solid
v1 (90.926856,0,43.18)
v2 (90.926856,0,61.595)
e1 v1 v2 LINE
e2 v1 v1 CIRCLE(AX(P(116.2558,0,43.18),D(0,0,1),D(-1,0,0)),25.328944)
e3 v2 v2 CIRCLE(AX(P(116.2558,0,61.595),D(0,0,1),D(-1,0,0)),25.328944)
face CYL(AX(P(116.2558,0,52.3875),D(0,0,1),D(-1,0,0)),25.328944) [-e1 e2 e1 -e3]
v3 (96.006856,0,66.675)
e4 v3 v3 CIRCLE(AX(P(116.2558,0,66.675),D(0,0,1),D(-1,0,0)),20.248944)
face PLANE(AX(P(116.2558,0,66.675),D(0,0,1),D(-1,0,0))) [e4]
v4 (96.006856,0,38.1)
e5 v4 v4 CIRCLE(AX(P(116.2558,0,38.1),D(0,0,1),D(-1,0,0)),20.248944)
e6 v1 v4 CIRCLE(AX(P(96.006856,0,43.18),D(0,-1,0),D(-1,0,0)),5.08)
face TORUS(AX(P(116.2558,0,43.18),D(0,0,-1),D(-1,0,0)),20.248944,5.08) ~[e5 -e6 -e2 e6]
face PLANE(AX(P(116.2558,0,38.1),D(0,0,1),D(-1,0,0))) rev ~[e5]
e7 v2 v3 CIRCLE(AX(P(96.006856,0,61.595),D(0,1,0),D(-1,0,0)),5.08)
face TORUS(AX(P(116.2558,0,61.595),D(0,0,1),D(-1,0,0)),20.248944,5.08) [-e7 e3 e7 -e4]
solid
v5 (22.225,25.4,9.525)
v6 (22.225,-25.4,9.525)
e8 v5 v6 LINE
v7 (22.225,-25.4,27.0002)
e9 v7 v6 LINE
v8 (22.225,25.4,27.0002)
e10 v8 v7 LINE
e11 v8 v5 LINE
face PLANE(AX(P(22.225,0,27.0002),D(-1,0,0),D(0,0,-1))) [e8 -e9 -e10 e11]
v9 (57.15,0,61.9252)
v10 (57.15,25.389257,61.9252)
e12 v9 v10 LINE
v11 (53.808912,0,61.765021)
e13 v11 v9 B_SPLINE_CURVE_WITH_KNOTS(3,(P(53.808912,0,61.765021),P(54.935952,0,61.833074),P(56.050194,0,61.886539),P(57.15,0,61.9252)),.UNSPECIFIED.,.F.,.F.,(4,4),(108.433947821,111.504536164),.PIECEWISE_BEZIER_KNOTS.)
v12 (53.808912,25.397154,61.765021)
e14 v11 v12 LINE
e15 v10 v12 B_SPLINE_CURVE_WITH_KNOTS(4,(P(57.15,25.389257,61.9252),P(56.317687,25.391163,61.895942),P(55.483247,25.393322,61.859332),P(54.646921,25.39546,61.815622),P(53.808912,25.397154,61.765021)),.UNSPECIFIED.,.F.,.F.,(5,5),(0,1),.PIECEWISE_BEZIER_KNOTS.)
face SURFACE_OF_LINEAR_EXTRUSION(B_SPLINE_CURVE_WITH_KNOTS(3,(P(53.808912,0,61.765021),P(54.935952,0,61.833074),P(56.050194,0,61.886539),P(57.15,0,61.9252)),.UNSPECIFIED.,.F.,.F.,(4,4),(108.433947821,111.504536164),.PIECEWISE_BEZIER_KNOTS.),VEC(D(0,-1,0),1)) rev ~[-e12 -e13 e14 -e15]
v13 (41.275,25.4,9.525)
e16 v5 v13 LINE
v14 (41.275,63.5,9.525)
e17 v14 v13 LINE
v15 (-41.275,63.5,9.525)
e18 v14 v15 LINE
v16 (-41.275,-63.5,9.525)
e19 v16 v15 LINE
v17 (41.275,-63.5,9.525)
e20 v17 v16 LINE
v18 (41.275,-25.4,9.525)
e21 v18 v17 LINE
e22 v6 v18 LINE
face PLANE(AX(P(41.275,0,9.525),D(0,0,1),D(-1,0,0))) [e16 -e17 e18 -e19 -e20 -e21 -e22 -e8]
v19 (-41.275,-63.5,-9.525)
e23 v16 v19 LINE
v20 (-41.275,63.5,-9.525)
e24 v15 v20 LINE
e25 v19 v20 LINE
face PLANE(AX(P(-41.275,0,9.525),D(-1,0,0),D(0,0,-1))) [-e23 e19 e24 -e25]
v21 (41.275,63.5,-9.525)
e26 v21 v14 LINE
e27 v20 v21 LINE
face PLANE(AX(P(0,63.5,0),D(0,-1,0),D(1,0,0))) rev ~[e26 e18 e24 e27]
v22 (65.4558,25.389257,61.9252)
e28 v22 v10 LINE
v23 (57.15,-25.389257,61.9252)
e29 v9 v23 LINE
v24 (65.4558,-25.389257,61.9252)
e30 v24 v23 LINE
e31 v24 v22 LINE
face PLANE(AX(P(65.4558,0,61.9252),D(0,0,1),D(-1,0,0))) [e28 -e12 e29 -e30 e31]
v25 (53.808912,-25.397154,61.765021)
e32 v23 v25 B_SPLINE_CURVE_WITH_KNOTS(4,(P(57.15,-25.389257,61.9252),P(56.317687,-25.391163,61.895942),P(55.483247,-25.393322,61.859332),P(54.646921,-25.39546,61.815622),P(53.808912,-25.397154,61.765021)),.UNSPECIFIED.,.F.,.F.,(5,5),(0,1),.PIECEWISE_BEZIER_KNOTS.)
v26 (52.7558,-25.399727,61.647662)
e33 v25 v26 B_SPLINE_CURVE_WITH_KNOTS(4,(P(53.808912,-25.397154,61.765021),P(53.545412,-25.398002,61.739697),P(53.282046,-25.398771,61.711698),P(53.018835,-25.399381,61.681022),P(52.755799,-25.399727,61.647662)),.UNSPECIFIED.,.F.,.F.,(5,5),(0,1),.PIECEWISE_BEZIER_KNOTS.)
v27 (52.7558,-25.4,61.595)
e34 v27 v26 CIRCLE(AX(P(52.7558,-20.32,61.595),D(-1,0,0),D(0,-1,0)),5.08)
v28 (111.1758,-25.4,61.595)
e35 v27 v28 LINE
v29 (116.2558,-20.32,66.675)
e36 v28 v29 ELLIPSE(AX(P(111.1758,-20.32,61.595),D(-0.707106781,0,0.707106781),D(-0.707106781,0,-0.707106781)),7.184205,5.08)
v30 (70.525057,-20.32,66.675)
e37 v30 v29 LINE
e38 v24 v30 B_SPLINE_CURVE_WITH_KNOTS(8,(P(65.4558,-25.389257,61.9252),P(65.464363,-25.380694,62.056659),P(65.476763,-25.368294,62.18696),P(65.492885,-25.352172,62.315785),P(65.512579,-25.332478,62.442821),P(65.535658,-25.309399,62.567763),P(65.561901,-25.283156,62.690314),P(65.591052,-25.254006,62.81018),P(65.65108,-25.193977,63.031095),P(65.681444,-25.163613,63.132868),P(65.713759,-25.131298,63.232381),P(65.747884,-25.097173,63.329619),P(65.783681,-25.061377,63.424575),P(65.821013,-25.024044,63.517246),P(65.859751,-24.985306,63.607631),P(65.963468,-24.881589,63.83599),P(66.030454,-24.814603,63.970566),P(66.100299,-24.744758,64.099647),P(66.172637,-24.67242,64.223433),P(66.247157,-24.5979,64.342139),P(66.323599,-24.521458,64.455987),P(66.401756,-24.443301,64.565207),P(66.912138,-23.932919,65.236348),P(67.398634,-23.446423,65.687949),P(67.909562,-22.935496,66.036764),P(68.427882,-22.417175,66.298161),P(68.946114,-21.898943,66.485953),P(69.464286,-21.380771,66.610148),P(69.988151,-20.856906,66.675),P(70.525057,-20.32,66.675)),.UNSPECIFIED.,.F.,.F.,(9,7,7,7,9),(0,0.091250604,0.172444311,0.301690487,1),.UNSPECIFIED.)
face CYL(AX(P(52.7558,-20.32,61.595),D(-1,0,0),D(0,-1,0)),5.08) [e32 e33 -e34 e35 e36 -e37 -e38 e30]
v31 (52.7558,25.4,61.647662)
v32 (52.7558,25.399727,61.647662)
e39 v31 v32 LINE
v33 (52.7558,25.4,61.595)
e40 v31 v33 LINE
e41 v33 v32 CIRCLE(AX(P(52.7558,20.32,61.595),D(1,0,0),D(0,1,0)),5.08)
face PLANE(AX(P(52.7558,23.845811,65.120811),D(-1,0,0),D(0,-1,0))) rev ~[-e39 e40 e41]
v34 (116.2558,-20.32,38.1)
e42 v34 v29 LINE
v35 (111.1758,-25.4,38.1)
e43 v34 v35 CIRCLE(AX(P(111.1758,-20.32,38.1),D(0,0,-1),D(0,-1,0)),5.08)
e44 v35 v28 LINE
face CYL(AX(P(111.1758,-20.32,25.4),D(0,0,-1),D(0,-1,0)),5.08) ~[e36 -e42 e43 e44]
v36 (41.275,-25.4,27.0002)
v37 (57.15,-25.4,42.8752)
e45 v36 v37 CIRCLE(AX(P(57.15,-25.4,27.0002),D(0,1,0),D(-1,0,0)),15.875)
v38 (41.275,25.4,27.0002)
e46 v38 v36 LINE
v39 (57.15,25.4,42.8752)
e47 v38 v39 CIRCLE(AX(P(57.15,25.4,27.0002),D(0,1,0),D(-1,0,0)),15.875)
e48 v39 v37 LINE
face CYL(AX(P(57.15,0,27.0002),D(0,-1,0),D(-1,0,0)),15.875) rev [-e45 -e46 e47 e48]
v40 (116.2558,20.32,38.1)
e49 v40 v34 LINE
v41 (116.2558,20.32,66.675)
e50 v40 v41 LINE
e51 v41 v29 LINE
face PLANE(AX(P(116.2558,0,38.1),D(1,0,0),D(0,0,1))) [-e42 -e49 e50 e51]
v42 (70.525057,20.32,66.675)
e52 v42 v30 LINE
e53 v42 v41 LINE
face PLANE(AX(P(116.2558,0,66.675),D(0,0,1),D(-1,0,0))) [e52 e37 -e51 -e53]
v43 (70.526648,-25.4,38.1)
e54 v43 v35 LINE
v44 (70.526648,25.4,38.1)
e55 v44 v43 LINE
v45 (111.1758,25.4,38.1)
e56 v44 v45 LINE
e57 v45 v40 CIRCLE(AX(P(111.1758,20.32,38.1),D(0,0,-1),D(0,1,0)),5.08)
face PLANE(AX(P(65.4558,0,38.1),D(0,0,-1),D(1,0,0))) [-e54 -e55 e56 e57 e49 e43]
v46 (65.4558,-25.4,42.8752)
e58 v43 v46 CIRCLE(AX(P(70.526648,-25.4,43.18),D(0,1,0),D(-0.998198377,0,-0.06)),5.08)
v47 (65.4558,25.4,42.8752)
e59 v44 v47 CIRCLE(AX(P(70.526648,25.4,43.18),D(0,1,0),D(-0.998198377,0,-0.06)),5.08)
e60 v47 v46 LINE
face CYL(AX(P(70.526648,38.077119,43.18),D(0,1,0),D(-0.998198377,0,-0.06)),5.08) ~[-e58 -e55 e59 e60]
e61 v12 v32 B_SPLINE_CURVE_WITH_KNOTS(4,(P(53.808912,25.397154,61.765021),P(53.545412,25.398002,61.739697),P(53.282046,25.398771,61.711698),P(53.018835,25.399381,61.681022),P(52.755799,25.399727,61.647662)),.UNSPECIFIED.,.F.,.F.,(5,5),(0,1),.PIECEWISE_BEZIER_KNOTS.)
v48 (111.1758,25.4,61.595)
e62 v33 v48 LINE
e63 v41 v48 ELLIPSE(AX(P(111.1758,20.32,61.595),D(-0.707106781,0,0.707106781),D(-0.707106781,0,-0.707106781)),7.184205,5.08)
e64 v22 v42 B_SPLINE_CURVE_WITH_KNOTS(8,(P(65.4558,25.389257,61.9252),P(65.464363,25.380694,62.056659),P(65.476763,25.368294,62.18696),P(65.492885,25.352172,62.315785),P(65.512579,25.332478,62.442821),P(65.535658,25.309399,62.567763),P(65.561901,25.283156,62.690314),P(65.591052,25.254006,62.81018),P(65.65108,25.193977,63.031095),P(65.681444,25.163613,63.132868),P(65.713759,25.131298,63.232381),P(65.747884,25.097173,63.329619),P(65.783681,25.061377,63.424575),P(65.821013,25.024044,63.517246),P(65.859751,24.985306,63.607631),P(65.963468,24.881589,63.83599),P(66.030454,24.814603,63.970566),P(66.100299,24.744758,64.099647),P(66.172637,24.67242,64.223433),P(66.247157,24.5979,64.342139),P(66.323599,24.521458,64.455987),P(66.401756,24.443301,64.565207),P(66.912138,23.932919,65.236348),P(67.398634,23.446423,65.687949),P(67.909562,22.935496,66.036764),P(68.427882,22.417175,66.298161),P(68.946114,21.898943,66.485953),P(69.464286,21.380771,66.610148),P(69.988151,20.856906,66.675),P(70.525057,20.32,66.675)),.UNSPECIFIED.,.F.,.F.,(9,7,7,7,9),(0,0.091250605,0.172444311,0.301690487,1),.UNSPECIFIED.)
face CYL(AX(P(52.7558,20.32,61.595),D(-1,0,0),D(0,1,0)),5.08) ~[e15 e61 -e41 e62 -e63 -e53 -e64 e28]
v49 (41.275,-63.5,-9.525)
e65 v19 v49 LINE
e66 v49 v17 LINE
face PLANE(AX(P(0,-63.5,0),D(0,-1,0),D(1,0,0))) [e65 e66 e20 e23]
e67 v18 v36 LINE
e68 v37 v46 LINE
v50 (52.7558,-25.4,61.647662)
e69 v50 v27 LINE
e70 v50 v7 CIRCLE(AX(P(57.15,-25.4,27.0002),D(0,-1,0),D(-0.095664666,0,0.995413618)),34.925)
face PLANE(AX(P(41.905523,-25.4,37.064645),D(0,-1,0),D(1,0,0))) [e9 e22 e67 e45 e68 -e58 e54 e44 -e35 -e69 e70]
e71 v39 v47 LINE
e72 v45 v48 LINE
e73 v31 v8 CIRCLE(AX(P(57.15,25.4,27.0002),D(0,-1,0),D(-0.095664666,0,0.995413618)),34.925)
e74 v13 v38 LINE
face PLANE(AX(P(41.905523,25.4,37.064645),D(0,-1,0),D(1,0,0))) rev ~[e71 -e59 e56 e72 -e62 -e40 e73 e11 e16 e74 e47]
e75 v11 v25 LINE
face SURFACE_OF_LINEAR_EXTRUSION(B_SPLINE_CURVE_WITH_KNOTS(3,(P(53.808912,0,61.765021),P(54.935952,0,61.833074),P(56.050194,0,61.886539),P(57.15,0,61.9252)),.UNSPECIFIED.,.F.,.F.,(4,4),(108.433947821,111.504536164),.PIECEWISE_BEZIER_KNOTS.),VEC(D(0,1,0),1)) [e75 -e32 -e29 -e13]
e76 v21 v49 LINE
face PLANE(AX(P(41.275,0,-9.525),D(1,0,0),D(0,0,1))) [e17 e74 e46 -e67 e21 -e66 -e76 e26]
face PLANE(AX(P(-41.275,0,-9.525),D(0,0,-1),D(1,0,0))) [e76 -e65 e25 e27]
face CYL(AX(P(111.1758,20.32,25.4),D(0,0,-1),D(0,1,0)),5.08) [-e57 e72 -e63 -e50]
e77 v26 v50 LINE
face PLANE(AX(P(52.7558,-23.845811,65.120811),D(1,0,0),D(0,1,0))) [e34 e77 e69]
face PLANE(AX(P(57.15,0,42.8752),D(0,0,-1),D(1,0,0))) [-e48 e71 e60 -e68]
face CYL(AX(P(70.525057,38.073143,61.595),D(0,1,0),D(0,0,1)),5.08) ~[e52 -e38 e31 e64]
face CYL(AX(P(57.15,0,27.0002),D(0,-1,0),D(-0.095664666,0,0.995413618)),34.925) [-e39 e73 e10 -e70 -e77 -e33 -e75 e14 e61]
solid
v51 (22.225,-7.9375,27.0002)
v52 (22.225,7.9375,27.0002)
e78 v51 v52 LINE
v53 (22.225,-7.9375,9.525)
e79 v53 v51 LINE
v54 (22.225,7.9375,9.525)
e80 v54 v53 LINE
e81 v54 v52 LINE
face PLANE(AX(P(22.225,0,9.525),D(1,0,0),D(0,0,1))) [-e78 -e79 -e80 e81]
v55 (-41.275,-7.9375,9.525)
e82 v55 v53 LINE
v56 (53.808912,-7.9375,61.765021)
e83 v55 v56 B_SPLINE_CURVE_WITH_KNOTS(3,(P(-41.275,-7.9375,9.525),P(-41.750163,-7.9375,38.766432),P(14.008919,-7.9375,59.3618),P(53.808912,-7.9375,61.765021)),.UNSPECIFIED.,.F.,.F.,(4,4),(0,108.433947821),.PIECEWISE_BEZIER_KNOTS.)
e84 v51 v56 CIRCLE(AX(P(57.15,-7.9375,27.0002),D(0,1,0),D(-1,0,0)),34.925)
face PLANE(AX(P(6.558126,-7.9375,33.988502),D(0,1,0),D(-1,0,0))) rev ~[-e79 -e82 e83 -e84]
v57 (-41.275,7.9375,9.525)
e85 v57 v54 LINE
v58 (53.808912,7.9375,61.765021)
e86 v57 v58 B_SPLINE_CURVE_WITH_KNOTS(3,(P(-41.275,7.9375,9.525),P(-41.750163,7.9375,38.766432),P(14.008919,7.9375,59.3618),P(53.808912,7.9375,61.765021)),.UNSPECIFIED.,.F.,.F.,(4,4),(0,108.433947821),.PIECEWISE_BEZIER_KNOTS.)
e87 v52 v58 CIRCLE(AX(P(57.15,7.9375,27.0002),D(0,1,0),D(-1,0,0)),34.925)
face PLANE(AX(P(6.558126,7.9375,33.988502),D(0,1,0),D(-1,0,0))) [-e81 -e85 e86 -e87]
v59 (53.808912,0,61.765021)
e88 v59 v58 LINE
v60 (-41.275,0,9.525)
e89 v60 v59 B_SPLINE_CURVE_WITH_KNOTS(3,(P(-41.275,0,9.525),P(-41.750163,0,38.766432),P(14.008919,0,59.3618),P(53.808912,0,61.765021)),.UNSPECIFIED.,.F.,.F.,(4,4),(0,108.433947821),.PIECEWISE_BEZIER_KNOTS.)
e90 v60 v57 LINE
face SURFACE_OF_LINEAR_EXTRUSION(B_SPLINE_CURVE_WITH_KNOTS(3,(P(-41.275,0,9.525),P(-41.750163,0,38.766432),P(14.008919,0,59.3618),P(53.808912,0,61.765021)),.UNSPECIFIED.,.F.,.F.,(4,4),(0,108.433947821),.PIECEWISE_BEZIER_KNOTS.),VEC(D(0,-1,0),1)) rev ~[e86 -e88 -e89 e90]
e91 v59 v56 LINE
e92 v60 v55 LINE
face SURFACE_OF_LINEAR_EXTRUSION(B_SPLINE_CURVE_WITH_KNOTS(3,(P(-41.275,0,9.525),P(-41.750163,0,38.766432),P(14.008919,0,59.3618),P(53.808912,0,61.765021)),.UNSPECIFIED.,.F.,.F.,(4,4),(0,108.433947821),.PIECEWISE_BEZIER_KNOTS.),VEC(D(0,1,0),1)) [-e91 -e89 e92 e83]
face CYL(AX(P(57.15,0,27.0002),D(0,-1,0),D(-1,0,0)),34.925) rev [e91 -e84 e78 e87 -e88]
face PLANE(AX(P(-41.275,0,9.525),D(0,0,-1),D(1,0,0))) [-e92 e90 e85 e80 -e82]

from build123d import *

# Parameters (mm, degrees)
F1_DEPTH    = 63.5
F0_W        = 25.3289441975
F0_H        = 28.575
F2_DEPTH    = 25.4
F3_DEPTH    = 7.9375
F5_T1_DEPTH = 76.2
F5_T3_DEPTH = 76.1542387778
F5_T5_DEPTH = 76.1462857042
F5_T7_DEPTH = 53.975
F5_2_F1_R   = 5.08
F5_2_F2_R   = 5.08


# Not quite as in the source:
# - a fillet or chamfer that OpenCascade refuses, or shapes differently, is made with other operations: its cross-section is extruded or revolved along the edge and cut away or added
# - a feature names something its author has since deleted; it is built from what else it names


with BuildPart() as f1:
    # F0 (on Front) → F1 (new body, symmetric)
    with BuildSketch(Plane.XZ):
        Polygon((-41.275, -9.525), (41.275, -9.525), (41.275, 9.525), (22.225, 9.525), (-41.275, 9.525), align=None)
    extrude(amount=F1_DEPTH, both=True)

    # F0 (on Front) → F2 (join, symmetric)
    with BuildSketch(Plane.XZ):
        with BuildLine():
            Line((22.225, 9.525), (41.275, 9.525))
            Line((41.275, 9.525), (41.275, 27.0002))
            ThreePointArc((41.275, 27.0002), (45.9246798487, 38.2255201513), (57.15, 42.8752))
            Line((57.15, 42.8752), (65.4558, 42.8752))
            Line((65.4558, 42.8752), (65.4558, 61.9252))
            Line((65.4558, 61.9252), (57.15, 61.9252))
            add(Edge.make_bspline(
                [(53.808911529, 61.7650206213), (54.9359515, 61.8330740331), (56.0501940999, 61.8865394151), (57.15, 61.9252)],
                knots=[108.4339478208, 108.4339478208, 108.4339478208, 108.4339478208, 111.5045361635, 111.5045361635, 111.5045361635, 111.5045361635], degree=3))
            ThreePointArc((53.808911529, 61.7650206213), (31.3000179899, 50.484962189), (22.225, 27.0002))
            Line((22.225, 27.0002), (22.225, 9.525))
        make_face()
        Polygon((65.4558, 61.9252), (65.4558, 42.8752), (65.4558, 38.1), (90.9268558025, 38.1), (90.9268558025, 66.675), (65.4558, 66.675), align=None)
        with Locations((103.5913279013, 52.3875)):
            Rectangle(F0_W, F0_H)
    extrude(amount=F2_DEPTH, both=True)

    # F5: fillet of radius 5.08 on 6 edges, made by hand

    # F5_s2 → F5_t1 (cut)
    with BuildSketch(Plane.YZ.offset(52.7558)):
        with BuildLine():
            ThreePointArc((25.4, 61.595), (23.9121024484, 65.1871024484), (20.32, 66.675))
            Line((20.32, 66.675), (25.4, 66.675))
            Line((25.4, 66.675), (25.4, 61.595))
        make_face()
        with BuildLine():
            ThreePointArc((-25.4, 61.595), (-23.9121024484, 65.1871024484), (-20.32, 66.675))
            Line((-20.32, 66.675), (-25.4, 66.675))
            Line((-25.4, 66.675), (-25.4, 61.595))
        make_face()
    extrude(amount=F5_T1_DEPTH, mode=Mode.SUBTRACT)

    # F5_s4 → F5_t3 (cut)
    with BuildSketch(Plane.XZ.offset(-38.0771193889)):
        with BuildLine():
            ThreePointArc((65.4558, 42.8752), (67.0439752185, 39.4817041762), (70.5266477556, 38.1))
            Line((70.5266477556, 38.1), (65.4558, 38.1))
            Line((65.4558, 38.1), (65.4558, 42.8752))
        make_face()
    extrude(amount=F5_T3_DEPTH, mode=Mode.SUBTRACT)

    # F5_s6 → F5_t5 (cut)
    with BuildSketch(Plane.XZ.offset(-38.0731428521)):
        with BuildLine():
            ThreePointArc((70.5250571408, 66.675), (67.0516593807, 65.3020079579), (65.4558, 61.9252))
            Line((65.4558, 61.9252), (65.4558, 66.675))
            Line((65.4558, 66.675), (70.5250571408, 66.675))
        make_face()
    extrude(amount=F5_T5_DEPTH, mode=Mode.SUBTRACT)

    # F5_s8 → F5_t7 (cut)
    with BuildSketch(Plane.XY.offset(25.4)):
        with BuildLine():
            ThreePointArc((111.1758, -25.4), (114.7679024484, -23.9121024484), (116.2558, -20.32))
            Line((116.2558, -20.32), (116.2558, -25.4))
            Line((116.2558, -25.4), (111.1758, -25.4))
        make_face()
        with BuildLine():
            ThreePointArc((111.1758, 25.4), (114.7679024484, 23.9121024484), (116.2558, 20.32))
            Line((116.2558, 20.32), (116.2558, 25.4))
            Line((116.2558, 25.4), (111.1758, 25.4))
        make_face()
    extrude(amount=F5_T7_DEPTH, mode=Mode.SUBTRACT)


with BuildPart() as f3:
    # F0 (on Front) → F3 (new body, symmetric)
    with BuildSketch(Plane.XZ):
        with BuildLine():
            add(Edge.make_bspline(
                [(-41.275, 9.525), (-41.7501631131, 38.7664319524), (14.0089189004, 59.3618003655), (53.808911529, 61.7650206213)],
                knots=[0, 0, 0, 0, 108.4339478208, 108.4339478208, 108.4339478208, 108.4339478208], degree=3))
            Line((-41.275, 9.525), (22.225, 9.525))
            Line((22.225, 9.525), (22.225, 27.0002))
            ThreePointArc((22.225, 27.0002), (31.3000179899, 50.484962189), (53.808911529, 61.7650206213))
        make_face()
    extrude(amount=F3_DEPTH, both=True)


with BuildPart() as f4:
    # F0 (on Front) → F4 (revolve)
    with BuildSketch(Plane.XZ):
        with Locations((103.5913279013, 52.3875)):
            Rectangle(F0_W, F0_H)
    revolve(axis=Axis((116.2558, 0, 52.3875), (0, 0, 1)))

    # F5#2: fillet of radius 5.08 on 2 edges, made by hand

    # F5_2_f1
    f5_2_f1_edges = [f4.edges().sort_by_distance(p)[0] for p in [
        (141.5847441975, 0, 66.675),
    ]]
    fillet(f5_2_f1_edges, radius=F5_2_F1_R)

    # F5_2_f2
    f5_2_f2_edges = [f4.edges().sort_by_distance(p)[0] for p in [
        (141.5847441975, 0, 38.1),
    ]]
    fillet(f5_2_f2_edges, radius=F5_2_F2_R)


solid = Compound([f1.part, f3.part, f4.part])
